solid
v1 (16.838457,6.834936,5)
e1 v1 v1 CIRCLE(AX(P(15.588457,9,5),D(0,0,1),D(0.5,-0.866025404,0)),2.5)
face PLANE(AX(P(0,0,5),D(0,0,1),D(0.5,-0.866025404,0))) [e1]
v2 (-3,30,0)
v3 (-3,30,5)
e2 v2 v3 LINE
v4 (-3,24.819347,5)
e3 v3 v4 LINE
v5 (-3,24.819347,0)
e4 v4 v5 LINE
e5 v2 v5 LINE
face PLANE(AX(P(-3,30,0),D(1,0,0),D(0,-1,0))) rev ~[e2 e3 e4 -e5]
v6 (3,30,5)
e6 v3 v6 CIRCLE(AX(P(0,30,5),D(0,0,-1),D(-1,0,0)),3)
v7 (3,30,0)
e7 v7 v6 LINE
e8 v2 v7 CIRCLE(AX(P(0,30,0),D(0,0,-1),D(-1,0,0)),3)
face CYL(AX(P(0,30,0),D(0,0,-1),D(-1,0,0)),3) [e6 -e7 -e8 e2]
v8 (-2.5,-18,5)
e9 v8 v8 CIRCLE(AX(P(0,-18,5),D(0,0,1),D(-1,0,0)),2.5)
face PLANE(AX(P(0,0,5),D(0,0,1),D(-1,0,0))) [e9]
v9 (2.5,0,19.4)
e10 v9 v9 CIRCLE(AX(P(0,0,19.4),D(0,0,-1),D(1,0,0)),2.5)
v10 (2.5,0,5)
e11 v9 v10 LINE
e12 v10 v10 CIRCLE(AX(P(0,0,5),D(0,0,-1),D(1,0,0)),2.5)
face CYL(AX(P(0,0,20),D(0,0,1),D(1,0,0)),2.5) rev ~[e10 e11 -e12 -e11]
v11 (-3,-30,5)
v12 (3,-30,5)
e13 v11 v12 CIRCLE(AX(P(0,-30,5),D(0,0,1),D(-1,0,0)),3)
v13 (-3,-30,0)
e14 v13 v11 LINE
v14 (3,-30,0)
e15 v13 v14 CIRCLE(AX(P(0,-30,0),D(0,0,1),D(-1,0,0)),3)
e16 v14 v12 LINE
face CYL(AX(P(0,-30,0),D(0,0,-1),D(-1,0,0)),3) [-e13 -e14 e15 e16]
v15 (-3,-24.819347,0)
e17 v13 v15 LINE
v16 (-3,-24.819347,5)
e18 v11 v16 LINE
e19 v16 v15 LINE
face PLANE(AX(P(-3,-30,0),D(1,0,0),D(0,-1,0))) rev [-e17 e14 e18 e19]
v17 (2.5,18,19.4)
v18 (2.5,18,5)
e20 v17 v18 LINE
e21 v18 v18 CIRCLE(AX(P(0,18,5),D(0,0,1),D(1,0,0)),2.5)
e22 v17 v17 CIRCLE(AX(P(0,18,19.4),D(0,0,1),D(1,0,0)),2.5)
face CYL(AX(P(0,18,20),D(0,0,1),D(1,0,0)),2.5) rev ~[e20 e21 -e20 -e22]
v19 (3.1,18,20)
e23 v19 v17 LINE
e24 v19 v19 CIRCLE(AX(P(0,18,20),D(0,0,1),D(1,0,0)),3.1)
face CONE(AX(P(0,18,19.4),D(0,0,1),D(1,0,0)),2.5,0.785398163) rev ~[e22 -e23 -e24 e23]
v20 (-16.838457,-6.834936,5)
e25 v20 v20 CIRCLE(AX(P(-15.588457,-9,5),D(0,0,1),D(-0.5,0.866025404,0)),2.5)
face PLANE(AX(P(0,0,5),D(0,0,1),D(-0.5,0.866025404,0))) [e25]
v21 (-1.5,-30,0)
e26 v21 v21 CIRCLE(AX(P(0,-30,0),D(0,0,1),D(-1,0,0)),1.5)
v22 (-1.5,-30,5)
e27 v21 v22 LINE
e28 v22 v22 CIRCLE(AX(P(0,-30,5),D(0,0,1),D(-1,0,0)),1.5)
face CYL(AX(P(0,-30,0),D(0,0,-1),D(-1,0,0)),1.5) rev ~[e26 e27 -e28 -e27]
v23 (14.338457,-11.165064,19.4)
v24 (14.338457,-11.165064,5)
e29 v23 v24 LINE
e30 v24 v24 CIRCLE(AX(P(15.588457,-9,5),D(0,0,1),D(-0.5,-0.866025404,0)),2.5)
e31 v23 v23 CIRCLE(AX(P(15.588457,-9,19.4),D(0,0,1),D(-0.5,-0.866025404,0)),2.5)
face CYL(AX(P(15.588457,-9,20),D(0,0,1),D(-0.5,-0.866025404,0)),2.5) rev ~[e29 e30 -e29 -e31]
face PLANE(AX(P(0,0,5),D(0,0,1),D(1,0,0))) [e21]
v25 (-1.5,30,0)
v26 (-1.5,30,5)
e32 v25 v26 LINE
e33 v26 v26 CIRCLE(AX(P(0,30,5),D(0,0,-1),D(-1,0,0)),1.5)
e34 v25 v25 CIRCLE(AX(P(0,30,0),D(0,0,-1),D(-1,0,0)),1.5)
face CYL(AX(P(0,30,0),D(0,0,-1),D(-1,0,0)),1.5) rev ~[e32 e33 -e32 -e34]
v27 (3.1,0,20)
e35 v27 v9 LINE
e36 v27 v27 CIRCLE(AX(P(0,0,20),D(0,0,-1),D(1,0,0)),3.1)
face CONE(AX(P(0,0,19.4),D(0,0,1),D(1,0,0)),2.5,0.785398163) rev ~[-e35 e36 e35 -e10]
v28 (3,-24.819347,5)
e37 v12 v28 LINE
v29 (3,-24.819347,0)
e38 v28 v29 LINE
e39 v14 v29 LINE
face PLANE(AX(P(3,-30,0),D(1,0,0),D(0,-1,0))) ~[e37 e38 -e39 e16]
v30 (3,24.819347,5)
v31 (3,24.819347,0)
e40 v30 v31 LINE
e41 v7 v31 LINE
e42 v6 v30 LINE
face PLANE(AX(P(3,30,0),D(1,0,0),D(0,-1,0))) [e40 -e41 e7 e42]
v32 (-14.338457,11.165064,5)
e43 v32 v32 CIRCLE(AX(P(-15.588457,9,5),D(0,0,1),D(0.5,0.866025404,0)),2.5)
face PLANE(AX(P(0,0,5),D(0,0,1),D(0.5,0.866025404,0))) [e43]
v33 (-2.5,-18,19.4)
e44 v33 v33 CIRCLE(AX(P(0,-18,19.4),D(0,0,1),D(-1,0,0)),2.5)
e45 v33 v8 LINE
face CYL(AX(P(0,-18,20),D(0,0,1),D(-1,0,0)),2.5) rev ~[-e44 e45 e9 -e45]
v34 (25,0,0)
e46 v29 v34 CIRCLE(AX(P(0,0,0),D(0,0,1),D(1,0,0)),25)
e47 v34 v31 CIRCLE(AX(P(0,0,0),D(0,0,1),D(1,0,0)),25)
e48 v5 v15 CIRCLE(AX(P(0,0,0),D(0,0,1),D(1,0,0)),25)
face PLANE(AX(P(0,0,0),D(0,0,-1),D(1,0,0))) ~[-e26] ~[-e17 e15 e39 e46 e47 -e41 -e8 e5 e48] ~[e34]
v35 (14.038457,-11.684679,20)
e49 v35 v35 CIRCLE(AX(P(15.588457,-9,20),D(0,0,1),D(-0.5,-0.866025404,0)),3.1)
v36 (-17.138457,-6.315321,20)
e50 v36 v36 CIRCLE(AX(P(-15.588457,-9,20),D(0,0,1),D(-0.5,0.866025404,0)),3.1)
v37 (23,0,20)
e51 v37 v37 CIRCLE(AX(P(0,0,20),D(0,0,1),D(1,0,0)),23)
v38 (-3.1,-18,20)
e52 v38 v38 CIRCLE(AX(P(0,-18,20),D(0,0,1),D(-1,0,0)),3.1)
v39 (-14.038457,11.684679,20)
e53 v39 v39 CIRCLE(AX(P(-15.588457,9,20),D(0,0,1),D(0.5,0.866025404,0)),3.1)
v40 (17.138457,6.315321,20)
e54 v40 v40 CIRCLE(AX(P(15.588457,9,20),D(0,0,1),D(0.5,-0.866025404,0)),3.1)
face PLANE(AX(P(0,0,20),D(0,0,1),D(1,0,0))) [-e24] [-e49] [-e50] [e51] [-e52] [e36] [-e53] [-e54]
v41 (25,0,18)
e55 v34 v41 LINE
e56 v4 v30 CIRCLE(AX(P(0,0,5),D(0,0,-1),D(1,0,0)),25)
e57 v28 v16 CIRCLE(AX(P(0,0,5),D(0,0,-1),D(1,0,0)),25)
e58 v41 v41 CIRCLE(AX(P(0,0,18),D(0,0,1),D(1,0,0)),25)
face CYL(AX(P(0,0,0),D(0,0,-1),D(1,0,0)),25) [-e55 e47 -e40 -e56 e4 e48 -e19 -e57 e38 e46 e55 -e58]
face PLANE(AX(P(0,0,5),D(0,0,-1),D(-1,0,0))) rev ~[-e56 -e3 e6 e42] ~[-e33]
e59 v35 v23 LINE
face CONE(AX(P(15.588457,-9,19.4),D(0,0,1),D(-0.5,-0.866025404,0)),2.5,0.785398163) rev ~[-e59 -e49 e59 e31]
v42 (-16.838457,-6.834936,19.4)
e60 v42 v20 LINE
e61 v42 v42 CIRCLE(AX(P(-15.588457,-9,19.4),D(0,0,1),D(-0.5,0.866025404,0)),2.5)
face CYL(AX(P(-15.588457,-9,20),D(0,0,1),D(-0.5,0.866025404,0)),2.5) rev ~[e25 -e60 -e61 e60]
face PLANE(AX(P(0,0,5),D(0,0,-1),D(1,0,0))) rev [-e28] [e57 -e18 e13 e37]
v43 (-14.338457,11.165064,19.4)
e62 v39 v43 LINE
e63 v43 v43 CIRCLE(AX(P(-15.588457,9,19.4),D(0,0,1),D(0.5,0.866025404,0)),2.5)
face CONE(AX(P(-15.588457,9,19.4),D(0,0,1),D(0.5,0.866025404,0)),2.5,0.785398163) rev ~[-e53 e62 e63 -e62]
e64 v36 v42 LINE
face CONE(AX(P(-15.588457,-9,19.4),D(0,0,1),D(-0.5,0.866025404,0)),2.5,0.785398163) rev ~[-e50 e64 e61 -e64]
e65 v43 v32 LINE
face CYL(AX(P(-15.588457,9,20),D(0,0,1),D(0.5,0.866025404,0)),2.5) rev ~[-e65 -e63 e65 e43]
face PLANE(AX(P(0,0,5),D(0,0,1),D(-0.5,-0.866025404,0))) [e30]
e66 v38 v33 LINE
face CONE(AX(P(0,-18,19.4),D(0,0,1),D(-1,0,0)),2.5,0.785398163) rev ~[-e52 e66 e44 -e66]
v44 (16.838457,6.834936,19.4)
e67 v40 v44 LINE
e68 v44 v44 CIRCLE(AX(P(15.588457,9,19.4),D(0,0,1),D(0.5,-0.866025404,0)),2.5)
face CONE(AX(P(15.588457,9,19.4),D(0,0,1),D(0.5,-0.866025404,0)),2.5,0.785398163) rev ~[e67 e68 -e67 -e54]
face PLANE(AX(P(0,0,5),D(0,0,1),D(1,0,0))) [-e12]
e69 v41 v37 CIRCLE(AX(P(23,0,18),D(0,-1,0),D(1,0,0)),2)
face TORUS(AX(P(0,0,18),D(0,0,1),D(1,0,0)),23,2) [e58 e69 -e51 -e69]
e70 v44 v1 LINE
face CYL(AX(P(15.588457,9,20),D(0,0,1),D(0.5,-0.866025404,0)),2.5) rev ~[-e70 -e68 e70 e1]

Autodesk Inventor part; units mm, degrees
ref_plane "YZ Plane" through (0, 0, 0) normal (1, 0, 0) x (0, 1, 0)
ref_plane "XZ Plane" through (0, 0, 0) normal (0, 1, 0) x (-1, 0, 0)
ref_plane "XY Plane" through (0, 0, 0) normal (0, 0, 1) x (1, 0, 0)
sketch "Esboço1" plane through (0, 0, 0) normal (0, 0, 1) x (1, 0, 0)
  circle A0 centre (0, 0) radius 25
  dimension "d0" = 50
extrude "Extrusão1" add sketch "Esboço1" along normal blind 20
fillet "Arredondamento1" radius 2 1 edges at (-25, 0, 20)
sketch "Esboço2" plane through (0, 0, 20) normal (0, 0, 1) x (1, 0, 0)
  circle A0 centre (0, 0) radius 2.5
  circle A1 centre (0, 18) radius 2.5
  dimension "d4" = 5
  dimension "d5" = 5
  dimension "d6" = 18
extrude "Extrusão2" cut sketch "Esboço2" against normal blind 15
chamfer "Chanfro1" distance 0.6 angle 45 2 edges at (-2.5, 0, 20) (-2.5, 18, 20)
pattern_circular "Padrão circular1" count 6 over 360 about axis through (0, 0, 0) along (0, 0, 1) of "Extrusão2", "Chanfro1"
sketch "Esboço3" plane through (0, 0, 0) normal (0, 0, -1) x (-1, 0, 0)
  arc A0 (3, 30) -> (-3, 30) centre (0, 30) ccw
  circle A1 centre (0, 30) radius 1.5
  line L0 (3, 30) -> (3, 24.3841)
  line L1 (-3, 30) -> (-3, 24.3841)
  line L2 (-3, 24.3841) -> (3, 24.3841)
  point P0 (0, 0)
  dimension "d15" = 6
  dimension "d16" = 3
  dimension "d17" = 30
extrude "Extrusão3" add sketch "Esboço3" against normal blind 5
mirror "Espelhamento1" about plane through (0, 0, 0) normal (0, 1, 0) of "Extrusão3"
sketch "Esboço4" plane through (0, 0, 20) normal (0, 0, 1) x (1, 0, 0)
  circle A0 centre (0, 0) radius 3.1 projected
sketch "Esboço5" plane through (0, 0, 20) normal (0, 0, 1) x (1, 0, 0)
  circle A0 centre (0, 18) radius 3.1 projected
sketch "Esboço6" plane through (0, 0, 20) normal (0, 0, 1) x (1, 0, 0)
  circle A0 centre (15.5885, 9) radius 3.1 projected
sketch "Esboço7" plane through (0, 0, 20) normal (0, 0, 1) x (1, 0, 0)
  circle A0 centre (15.5885, -9) radius 3.1 projected
sketch "Esboço8" plane through (0, 0, 20) normal (0, 0, 1) x (1, 0, 0)
  circle A0 centre (0, -18) radius 3.1 projected
sketch "Esboço9" plane through (0, 0, 20) normal (0, 0, 1) x (1, 0, 0)
  circle A0 centre (-15.5885, -9) radius 3.1 projected
sketch "Esboço10" plane through (0, 0, 20) normal (0, 0, 1) x (1, 0, 0)
  circle A0 centre (-15.5885, 9) radius 3.1 projected
properties part number "Conector1"
